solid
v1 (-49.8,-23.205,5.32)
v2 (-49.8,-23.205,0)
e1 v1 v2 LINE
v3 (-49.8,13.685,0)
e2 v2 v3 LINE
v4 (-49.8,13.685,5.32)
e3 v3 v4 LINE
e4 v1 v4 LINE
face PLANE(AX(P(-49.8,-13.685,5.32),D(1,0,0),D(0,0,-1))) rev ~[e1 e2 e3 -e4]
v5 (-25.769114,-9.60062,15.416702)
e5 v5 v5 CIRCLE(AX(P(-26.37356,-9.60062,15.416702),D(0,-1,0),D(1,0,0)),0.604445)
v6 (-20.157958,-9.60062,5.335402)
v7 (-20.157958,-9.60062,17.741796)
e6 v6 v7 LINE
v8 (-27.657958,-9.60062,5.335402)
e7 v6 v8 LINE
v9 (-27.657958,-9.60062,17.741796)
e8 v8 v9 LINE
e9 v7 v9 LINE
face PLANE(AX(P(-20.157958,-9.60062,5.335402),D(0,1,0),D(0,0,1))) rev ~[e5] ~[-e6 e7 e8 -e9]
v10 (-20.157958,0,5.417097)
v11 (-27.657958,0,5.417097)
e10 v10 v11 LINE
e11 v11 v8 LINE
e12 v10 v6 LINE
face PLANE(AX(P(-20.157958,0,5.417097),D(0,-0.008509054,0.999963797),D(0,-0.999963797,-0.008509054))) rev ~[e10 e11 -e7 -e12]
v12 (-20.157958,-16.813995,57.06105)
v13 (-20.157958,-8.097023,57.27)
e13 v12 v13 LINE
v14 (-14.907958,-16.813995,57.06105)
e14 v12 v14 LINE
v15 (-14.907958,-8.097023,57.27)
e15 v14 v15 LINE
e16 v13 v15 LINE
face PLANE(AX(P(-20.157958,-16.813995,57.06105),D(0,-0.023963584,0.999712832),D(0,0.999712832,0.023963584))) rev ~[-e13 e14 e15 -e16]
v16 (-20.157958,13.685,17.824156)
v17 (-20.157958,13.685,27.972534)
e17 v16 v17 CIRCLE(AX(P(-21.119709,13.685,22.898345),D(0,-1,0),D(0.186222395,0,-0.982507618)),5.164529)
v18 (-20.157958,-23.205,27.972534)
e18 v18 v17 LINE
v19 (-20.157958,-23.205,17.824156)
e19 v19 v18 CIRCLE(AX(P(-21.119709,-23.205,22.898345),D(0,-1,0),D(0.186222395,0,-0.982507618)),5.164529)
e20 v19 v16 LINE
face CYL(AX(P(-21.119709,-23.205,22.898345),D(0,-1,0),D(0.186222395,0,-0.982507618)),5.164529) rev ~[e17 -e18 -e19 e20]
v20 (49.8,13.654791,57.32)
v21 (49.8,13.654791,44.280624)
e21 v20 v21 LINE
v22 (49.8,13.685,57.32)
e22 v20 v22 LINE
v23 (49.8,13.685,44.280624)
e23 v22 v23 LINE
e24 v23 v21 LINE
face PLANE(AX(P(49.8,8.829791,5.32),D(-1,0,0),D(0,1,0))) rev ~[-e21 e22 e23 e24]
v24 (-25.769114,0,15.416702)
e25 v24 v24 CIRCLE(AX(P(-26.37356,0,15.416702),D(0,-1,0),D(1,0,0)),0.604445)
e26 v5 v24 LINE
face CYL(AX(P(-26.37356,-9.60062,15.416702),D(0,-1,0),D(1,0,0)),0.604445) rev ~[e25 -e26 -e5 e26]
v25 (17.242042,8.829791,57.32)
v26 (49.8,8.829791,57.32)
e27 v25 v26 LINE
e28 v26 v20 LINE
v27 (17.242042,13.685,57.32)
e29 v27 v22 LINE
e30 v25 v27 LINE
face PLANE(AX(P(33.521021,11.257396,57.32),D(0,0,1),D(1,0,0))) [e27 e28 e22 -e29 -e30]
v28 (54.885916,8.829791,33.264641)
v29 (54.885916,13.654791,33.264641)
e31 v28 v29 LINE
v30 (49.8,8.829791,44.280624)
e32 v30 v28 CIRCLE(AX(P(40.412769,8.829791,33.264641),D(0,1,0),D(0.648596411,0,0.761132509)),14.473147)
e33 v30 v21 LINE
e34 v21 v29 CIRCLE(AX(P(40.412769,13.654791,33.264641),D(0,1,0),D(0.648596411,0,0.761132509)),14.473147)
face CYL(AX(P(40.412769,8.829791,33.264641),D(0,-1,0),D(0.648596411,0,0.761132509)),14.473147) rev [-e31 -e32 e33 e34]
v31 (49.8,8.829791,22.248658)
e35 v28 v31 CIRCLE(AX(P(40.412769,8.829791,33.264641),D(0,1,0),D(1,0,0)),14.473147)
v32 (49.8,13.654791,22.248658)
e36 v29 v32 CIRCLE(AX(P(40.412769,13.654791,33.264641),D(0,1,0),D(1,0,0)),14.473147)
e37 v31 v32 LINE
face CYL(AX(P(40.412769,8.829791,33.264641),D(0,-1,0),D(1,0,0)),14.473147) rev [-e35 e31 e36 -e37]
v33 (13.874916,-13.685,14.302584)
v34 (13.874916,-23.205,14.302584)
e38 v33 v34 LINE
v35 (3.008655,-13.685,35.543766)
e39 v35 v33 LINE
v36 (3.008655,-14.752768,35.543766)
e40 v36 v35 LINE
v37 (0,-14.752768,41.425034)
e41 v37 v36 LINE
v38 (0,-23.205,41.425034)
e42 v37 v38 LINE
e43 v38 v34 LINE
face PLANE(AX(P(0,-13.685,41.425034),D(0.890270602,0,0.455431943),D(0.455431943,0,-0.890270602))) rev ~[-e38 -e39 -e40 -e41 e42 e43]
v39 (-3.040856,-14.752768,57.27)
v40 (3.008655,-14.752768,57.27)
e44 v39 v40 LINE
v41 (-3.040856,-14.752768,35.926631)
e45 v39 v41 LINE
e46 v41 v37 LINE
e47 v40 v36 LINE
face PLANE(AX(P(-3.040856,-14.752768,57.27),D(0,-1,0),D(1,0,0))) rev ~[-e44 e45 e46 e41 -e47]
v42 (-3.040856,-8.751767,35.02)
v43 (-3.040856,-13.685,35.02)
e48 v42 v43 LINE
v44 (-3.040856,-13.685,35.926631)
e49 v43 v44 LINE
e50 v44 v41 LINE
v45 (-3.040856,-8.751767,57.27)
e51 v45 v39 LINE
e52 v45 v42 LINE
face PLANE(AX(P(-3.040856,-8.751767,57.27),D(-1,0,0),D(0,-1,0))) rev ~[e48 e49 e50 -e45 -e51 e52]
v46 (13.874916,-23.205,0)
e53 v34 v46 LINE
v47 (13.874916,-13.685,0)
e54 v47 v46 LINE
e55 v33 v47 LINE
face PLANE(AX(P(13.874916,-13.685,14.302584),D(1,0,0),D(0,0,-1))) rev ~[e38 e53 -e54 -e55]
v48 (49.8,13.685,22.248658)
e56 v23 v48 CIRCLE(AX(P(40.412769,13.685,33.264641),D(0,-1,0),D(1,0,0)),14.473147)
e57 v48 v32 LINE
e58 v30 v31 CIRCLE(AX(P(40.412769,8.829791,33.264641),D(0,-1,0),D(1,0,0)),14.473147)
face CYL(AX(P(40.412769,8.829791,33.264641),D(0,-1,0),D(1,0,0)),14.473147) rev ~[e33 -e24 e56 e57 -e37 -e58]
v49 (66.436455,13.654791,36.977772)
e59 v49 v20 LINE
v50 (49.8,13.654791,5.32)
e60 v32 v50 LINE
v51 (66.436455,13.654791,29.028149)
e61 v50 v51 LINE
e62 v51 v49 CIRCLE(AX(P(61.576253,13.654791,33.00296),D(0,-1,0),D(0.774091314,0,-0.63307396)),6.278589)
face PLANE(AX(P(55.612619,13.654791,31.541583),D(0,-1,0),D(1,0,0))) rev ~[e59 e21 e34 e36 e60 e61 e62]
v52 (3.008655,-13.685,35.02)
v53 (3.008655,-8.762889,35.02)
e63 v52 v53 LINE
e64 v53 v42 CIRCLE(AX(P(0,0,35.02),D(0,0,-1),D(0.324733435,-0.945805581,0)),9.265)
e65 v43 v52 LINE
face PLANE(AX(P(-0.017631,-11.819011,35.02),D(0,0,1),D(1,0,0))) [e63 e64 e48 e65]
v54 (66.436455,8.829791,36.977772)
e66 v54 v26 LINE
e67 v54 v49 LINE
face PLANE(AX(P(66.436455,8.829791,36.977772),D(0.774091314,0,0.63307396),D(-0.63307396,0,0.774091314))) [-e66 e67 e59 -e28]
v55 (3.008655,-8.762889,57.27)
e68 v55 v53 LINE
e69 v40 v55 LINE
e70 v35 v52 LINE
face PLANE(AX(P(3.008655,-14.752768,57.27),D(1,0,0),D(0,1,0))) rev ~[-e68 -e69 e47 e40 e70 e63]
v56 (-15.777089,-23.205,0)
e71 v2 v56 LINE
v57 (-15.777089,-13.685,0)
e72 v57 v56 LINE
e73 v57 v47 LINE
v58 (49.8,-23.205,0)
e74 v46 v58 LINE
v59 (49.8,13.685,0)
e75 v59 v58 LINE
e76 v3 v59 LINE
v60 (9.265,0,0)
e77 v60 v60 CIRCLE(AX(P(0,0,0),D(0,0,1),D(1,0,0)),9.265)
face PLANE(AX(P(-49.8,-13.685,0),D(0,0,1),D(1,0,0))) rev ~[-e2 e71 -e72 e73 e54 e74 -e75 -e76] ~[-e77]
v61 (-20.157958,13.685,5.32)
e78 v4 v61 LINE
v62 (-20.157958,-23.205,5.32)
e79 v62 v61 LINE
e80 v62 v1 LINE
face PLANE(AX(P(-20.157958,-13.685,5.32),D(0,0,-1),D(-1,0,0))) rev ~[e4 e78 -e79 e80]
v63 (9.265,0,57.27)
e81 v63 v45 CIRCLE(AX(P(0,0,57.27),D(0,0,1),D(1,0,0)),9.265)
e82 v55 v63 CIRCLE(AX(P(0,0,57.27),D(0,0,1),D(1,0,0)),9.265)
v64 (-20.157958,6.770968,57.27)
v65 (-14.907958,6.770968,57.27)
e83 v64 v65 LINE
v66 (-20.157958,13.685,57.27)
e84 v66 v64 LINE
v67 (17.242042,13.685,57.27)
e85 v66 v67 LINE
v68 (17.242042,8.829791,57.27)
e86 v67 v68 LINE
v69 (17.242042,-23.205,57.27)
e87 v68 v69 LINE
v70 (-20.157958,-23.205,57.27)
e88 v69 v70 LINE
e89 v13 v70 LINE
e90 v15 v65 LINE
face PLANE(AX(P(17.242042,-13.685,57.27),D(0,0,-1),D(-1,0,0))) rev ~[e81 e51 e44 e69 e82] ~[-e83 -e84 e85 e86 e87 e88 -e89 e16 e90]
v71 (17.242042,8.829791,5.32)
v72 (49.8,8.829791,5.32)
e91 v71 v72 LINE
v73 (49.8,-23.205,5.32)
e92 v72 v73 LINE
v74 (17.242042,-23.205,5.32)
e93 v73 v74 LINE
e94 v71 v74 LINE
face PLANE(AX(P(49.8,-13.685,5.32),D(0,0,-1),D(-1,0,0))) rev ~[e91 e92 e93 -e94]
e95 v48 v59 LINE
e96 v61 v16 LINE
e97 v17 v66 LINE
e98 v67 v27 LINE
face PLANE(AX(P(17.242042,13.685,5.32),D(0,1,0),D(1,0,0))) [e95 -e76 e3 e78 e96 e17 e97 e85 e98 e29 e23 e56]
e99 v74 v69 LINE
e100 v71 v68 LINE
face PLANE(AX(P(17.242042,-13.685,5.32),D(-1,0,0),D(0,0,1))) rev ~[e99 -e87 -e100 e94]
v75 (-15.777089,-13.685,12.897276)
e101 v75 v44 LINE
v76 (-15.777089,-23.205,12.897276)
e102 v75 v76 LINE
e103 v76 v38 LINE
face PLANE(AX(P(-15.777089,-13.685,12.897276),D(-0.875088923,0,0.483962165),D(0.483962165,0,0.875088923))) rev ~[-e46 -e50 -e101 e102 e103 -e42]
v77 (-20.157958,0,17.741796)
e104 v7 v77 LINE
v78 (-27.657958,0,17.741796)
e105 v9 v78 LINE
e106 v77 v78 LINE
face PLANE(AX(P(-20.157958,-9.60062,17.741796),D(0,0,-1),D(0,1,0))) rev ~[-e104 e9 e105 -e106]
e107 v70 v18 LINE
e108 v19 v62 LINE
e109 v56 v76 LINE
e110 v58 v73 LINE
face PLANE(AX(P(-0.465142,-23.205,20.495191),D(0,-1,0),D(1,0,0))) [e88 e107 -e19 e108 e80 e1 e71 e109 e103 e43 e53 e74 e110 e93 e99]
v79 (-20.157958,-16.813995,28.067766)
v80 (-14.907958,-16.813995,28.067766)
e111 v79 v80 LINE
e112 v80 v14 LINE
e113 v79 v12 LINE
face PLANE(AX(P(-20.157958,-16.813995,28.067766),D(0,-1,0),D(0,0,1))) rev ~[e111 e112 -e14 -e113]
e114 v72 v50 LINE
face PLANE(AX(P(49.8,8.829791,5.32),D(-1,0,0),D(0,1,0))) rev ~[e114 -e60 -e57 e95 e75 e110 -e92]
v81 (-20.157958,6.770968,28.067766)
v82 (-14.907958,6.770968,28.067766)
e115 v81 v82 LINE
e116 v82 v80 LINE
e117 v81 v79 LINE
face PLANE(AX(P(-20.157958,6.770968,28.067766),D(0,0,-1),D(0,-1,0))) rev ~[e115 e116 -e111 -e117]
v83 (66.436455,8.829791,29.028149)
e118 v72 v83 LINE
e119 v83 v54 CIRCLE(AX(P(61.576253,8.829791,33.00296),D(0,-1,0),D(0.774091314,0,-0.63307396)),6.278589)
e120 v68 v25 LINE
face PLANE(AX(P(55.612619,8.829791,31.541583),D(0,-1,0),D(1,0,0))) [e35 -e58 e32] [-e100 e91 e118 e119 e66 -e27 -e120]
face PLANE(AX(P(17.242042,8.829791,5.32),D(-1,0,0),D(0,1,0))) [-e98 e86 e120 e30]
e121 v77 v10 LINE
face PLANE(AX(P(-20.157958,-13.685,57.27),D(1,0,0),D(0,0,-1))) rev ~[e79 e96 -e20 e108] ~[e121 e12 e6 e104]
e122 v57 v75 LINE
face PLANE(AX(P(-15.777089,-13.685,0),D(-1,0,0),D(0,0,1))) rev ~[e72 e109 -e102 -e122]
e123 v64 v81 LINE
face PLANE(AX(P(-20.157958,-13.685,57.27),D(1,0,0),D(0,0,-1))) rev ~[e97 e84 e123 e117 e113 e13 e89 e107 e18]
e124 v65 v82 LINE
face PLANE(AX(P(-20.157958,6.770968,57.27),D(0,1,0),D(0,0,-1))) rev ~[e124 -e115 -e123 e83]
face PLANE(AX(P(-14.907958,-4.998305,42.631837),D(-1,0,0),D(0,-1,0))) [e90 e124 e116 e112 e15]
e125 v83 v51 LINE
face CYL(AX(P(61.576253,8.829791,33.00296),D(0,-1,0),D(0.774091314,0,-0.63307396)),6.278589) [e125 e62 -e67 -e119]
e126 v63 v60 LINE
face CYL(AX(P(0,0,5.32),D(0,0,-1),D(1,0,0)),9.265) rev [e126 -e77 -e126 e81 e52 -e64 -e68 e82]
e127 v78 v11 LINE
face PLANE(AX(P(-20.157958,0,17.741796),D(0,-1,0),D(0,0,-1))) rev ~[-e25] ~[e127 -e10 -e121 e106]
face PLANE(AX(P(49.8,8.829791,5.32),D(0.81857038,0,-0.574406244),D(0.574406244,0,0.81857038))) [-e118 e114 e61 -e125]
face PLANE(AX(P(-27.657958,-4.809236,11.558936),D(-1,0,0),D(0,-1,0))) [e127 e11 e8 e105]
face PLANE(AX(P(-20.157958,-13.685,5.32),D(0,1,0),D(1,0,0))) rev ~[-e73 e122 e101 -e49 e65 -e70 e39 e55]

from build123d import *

# Parameters (mm, degrees)
F0_W      = 99.6
F0_H      = 27.37
F0_R      = 9.265
F1_DEPTH  = 5.32
F2_W      = 37.4
F2_H      = 27.37
F2_R      = 9.265
F3_DEPTH  = 51.95
F5_DEPTH  = 9.52
F7_DEPTH  = 22.25
F10_DEPTH = 37.475
F12_DEPTH = 7.5
F14_DEPTH = 5.25
F15_R     = 0.6044453377
F16_DEPTH = 25
F18_W     = 32.5579583809
F18_H     = 4.8552089012
F19_DEPTH = 52
F21_DEPTH = 4.825
F22_DEPTH = 25


with BuildPart() as f1:
    # F0 (on Top) → F1 (new body)
    with BuildSketch(Plane.XY):
        Rectangle(F0_W, F0_H)
        Circle(F0_R, mode=Mode.SUBTRACT)
    extrude(amount=F1_DEPTH)

    # F2 (on face) → F3 (join)
    with BuildSketch(Plane.XY.offset(5.32)):
        with Locations((-1.4579583809, 0)):
            Rectangle(F2_W, F2_H)
        Circle(F2_R, mode=Mode.SUBTRACT)
    extrude(amount=F3_DEPTH)

    # F4 (on face) → F5 (join)
    with BuildSketch(Plane.XZ.offset(13.685)):
        Polygon((-49.8, 0), (-15.7770887017, 0), (-15.7770887017, 12.8972763196), (0, 41.4250344038), (13.8749163598, 14.3025843427), (13.8749163598, 0), (49.8, 0), (49.8, 5.32), (17.2420416191, 5.32), (17.2420416191, 57.27), (-20.1579583809, 57.27), (-20.1579583809, 5.32), (-49.8, 5.32), align=None)
    extrude(amount=F5_DEPTH)

    # F6 (on face) → F7 (cut)
    with BuildSketch(Plane.XY.offset(57.27)):
        with BuildLine():
            ThreePointArc((3.0086552724, -8.7628887047), (-0.017033567, -9.264984342), (-3.0408557647, -8.7517667484))
            Line((-3.0408557647, -8.7517667484), (-3.0408557647, -14.7527681977))
            Line((-3.0408557647, -14.7527681977), (3.0086552724, -14.7527681977))
            Line((3.0086552724, -14.7527681977), (3.0086552724, -8.7628887047))
        make_face()
    extrude(amount=-F7_DEPTH, mode=Mode.SUBTRACT)

    # F9 (on face) → F10 (cut)
    with BuildSketch(Plane.XZ.offset(23.205)):
        with BuildLine():
            Line((-20.1579583809, 27.9725342989), (-20.1579583809, 17.8241562098))
            ThreePointArc((-20.1579583809, 17.8241562098), (-15.9551803728, 22.8983452544), (-20.1579583809, 27.9725342989))
        make_face()
    extrude(amount=-F10_DEPTH, mode=Mode.SUBTRACT)

    # F11 (on face) → F12 (join)
    with BuildSketch(Plane(origin=(-20.1579583809, 0, 0), x_dir=(0, -1, 0), z_dir=(-1, 0, 0))):
        Polygon((0, 17.7417956293), (0, 5.4170973599), (9.6006197855, 5.3354022093), (9.6006197855, 17.7417956293), align=None)
    extrude(amount=F12_DEPTH)

    # F13 (on face) → F14 (cut)
    with BuildSketch(Plane(origin=(-20.1579583809, 0, 0), x_dir=(0, -1, 0), z_dir=(-1, 0, 0))):
        Polygon((8.0970225025, 57.27), (-6.7709684372, 57.27), (-6.7709684372, 28.0677657574), (16.8139953166, 28.0677657574), (16.8139953166, 57.0610500872), align=None)
    extrude(amount=-F14_DEPTH, mode=Mode.SUBTRACT)

    # F15 (on face) → F16 (cut)
    with BuildSketch(Plane.XZ.offset(9.6006197855)):
        with Locations((-26.3735596091, 15.4167022556)):
            Circle(F15_R)
    extrude(amount=-F16_DEPTH, mode=Mode.SUBTRACT)

    # F18 (on face) → F19 (join)
    with BuildSketch(Plane.XY.offset(5.32)):
        with Locations((33.5210208096, 11.2573955494)):
            Rectangle(F18_W, F18_H)
    extrude(amount=F19_DEPTH)

    # F20 (on face) → F21 (join)
    with BuildSketch(Plane.XZ.offset(-8.8297910988)):
        with BuildLine():
            Line((49.8, 57.32), (49.8, 44.2806235084))
            ThreePointArc((49.8, 44.2806235084), (53.5530649007, 39.3313205539), (54.8859158534, 33.2646407187))
            ThreePointArc((54.8859158534, 33.2646407187), (53.5530649007, 27.1979608835), (49.8, 22.248657929))
            Line((49.8, 22.248657929), (49.8, 5.32))
            Line((49.8, 5.32), (66.4364546537, 29.0281493217))
            ThreePointArc((66.4364546537, 29.0281493217), (67.8548424387, 33.0029604957), (66.4364546537, 36.9777716696))
            Line((66.4364546537, 36.9777716696), (49.8, 57.32))
        make_face()
    extrude(amount=-F21_DEPTH)

    # F20 (on face) → F22 (cut)
    with BuildSketch(Plane.XZ.offset(-8.8297910988)):
        with BuildLine():
            ThreePointArc((25.9396215898, 33.2646407187), (40.4127687216, 18.7914935869), (54.8859158534, 33.2646407187))
            ThreePointArc((54.8859158534, 33.2646407187), (40.4127687216, 47.7377878505), (25.9396215898, 33.2646407187))
        make_face()
    extrude(amount=-F22_DEPTH, mode=Mode.SUBTRACT)


solid = f1.part
